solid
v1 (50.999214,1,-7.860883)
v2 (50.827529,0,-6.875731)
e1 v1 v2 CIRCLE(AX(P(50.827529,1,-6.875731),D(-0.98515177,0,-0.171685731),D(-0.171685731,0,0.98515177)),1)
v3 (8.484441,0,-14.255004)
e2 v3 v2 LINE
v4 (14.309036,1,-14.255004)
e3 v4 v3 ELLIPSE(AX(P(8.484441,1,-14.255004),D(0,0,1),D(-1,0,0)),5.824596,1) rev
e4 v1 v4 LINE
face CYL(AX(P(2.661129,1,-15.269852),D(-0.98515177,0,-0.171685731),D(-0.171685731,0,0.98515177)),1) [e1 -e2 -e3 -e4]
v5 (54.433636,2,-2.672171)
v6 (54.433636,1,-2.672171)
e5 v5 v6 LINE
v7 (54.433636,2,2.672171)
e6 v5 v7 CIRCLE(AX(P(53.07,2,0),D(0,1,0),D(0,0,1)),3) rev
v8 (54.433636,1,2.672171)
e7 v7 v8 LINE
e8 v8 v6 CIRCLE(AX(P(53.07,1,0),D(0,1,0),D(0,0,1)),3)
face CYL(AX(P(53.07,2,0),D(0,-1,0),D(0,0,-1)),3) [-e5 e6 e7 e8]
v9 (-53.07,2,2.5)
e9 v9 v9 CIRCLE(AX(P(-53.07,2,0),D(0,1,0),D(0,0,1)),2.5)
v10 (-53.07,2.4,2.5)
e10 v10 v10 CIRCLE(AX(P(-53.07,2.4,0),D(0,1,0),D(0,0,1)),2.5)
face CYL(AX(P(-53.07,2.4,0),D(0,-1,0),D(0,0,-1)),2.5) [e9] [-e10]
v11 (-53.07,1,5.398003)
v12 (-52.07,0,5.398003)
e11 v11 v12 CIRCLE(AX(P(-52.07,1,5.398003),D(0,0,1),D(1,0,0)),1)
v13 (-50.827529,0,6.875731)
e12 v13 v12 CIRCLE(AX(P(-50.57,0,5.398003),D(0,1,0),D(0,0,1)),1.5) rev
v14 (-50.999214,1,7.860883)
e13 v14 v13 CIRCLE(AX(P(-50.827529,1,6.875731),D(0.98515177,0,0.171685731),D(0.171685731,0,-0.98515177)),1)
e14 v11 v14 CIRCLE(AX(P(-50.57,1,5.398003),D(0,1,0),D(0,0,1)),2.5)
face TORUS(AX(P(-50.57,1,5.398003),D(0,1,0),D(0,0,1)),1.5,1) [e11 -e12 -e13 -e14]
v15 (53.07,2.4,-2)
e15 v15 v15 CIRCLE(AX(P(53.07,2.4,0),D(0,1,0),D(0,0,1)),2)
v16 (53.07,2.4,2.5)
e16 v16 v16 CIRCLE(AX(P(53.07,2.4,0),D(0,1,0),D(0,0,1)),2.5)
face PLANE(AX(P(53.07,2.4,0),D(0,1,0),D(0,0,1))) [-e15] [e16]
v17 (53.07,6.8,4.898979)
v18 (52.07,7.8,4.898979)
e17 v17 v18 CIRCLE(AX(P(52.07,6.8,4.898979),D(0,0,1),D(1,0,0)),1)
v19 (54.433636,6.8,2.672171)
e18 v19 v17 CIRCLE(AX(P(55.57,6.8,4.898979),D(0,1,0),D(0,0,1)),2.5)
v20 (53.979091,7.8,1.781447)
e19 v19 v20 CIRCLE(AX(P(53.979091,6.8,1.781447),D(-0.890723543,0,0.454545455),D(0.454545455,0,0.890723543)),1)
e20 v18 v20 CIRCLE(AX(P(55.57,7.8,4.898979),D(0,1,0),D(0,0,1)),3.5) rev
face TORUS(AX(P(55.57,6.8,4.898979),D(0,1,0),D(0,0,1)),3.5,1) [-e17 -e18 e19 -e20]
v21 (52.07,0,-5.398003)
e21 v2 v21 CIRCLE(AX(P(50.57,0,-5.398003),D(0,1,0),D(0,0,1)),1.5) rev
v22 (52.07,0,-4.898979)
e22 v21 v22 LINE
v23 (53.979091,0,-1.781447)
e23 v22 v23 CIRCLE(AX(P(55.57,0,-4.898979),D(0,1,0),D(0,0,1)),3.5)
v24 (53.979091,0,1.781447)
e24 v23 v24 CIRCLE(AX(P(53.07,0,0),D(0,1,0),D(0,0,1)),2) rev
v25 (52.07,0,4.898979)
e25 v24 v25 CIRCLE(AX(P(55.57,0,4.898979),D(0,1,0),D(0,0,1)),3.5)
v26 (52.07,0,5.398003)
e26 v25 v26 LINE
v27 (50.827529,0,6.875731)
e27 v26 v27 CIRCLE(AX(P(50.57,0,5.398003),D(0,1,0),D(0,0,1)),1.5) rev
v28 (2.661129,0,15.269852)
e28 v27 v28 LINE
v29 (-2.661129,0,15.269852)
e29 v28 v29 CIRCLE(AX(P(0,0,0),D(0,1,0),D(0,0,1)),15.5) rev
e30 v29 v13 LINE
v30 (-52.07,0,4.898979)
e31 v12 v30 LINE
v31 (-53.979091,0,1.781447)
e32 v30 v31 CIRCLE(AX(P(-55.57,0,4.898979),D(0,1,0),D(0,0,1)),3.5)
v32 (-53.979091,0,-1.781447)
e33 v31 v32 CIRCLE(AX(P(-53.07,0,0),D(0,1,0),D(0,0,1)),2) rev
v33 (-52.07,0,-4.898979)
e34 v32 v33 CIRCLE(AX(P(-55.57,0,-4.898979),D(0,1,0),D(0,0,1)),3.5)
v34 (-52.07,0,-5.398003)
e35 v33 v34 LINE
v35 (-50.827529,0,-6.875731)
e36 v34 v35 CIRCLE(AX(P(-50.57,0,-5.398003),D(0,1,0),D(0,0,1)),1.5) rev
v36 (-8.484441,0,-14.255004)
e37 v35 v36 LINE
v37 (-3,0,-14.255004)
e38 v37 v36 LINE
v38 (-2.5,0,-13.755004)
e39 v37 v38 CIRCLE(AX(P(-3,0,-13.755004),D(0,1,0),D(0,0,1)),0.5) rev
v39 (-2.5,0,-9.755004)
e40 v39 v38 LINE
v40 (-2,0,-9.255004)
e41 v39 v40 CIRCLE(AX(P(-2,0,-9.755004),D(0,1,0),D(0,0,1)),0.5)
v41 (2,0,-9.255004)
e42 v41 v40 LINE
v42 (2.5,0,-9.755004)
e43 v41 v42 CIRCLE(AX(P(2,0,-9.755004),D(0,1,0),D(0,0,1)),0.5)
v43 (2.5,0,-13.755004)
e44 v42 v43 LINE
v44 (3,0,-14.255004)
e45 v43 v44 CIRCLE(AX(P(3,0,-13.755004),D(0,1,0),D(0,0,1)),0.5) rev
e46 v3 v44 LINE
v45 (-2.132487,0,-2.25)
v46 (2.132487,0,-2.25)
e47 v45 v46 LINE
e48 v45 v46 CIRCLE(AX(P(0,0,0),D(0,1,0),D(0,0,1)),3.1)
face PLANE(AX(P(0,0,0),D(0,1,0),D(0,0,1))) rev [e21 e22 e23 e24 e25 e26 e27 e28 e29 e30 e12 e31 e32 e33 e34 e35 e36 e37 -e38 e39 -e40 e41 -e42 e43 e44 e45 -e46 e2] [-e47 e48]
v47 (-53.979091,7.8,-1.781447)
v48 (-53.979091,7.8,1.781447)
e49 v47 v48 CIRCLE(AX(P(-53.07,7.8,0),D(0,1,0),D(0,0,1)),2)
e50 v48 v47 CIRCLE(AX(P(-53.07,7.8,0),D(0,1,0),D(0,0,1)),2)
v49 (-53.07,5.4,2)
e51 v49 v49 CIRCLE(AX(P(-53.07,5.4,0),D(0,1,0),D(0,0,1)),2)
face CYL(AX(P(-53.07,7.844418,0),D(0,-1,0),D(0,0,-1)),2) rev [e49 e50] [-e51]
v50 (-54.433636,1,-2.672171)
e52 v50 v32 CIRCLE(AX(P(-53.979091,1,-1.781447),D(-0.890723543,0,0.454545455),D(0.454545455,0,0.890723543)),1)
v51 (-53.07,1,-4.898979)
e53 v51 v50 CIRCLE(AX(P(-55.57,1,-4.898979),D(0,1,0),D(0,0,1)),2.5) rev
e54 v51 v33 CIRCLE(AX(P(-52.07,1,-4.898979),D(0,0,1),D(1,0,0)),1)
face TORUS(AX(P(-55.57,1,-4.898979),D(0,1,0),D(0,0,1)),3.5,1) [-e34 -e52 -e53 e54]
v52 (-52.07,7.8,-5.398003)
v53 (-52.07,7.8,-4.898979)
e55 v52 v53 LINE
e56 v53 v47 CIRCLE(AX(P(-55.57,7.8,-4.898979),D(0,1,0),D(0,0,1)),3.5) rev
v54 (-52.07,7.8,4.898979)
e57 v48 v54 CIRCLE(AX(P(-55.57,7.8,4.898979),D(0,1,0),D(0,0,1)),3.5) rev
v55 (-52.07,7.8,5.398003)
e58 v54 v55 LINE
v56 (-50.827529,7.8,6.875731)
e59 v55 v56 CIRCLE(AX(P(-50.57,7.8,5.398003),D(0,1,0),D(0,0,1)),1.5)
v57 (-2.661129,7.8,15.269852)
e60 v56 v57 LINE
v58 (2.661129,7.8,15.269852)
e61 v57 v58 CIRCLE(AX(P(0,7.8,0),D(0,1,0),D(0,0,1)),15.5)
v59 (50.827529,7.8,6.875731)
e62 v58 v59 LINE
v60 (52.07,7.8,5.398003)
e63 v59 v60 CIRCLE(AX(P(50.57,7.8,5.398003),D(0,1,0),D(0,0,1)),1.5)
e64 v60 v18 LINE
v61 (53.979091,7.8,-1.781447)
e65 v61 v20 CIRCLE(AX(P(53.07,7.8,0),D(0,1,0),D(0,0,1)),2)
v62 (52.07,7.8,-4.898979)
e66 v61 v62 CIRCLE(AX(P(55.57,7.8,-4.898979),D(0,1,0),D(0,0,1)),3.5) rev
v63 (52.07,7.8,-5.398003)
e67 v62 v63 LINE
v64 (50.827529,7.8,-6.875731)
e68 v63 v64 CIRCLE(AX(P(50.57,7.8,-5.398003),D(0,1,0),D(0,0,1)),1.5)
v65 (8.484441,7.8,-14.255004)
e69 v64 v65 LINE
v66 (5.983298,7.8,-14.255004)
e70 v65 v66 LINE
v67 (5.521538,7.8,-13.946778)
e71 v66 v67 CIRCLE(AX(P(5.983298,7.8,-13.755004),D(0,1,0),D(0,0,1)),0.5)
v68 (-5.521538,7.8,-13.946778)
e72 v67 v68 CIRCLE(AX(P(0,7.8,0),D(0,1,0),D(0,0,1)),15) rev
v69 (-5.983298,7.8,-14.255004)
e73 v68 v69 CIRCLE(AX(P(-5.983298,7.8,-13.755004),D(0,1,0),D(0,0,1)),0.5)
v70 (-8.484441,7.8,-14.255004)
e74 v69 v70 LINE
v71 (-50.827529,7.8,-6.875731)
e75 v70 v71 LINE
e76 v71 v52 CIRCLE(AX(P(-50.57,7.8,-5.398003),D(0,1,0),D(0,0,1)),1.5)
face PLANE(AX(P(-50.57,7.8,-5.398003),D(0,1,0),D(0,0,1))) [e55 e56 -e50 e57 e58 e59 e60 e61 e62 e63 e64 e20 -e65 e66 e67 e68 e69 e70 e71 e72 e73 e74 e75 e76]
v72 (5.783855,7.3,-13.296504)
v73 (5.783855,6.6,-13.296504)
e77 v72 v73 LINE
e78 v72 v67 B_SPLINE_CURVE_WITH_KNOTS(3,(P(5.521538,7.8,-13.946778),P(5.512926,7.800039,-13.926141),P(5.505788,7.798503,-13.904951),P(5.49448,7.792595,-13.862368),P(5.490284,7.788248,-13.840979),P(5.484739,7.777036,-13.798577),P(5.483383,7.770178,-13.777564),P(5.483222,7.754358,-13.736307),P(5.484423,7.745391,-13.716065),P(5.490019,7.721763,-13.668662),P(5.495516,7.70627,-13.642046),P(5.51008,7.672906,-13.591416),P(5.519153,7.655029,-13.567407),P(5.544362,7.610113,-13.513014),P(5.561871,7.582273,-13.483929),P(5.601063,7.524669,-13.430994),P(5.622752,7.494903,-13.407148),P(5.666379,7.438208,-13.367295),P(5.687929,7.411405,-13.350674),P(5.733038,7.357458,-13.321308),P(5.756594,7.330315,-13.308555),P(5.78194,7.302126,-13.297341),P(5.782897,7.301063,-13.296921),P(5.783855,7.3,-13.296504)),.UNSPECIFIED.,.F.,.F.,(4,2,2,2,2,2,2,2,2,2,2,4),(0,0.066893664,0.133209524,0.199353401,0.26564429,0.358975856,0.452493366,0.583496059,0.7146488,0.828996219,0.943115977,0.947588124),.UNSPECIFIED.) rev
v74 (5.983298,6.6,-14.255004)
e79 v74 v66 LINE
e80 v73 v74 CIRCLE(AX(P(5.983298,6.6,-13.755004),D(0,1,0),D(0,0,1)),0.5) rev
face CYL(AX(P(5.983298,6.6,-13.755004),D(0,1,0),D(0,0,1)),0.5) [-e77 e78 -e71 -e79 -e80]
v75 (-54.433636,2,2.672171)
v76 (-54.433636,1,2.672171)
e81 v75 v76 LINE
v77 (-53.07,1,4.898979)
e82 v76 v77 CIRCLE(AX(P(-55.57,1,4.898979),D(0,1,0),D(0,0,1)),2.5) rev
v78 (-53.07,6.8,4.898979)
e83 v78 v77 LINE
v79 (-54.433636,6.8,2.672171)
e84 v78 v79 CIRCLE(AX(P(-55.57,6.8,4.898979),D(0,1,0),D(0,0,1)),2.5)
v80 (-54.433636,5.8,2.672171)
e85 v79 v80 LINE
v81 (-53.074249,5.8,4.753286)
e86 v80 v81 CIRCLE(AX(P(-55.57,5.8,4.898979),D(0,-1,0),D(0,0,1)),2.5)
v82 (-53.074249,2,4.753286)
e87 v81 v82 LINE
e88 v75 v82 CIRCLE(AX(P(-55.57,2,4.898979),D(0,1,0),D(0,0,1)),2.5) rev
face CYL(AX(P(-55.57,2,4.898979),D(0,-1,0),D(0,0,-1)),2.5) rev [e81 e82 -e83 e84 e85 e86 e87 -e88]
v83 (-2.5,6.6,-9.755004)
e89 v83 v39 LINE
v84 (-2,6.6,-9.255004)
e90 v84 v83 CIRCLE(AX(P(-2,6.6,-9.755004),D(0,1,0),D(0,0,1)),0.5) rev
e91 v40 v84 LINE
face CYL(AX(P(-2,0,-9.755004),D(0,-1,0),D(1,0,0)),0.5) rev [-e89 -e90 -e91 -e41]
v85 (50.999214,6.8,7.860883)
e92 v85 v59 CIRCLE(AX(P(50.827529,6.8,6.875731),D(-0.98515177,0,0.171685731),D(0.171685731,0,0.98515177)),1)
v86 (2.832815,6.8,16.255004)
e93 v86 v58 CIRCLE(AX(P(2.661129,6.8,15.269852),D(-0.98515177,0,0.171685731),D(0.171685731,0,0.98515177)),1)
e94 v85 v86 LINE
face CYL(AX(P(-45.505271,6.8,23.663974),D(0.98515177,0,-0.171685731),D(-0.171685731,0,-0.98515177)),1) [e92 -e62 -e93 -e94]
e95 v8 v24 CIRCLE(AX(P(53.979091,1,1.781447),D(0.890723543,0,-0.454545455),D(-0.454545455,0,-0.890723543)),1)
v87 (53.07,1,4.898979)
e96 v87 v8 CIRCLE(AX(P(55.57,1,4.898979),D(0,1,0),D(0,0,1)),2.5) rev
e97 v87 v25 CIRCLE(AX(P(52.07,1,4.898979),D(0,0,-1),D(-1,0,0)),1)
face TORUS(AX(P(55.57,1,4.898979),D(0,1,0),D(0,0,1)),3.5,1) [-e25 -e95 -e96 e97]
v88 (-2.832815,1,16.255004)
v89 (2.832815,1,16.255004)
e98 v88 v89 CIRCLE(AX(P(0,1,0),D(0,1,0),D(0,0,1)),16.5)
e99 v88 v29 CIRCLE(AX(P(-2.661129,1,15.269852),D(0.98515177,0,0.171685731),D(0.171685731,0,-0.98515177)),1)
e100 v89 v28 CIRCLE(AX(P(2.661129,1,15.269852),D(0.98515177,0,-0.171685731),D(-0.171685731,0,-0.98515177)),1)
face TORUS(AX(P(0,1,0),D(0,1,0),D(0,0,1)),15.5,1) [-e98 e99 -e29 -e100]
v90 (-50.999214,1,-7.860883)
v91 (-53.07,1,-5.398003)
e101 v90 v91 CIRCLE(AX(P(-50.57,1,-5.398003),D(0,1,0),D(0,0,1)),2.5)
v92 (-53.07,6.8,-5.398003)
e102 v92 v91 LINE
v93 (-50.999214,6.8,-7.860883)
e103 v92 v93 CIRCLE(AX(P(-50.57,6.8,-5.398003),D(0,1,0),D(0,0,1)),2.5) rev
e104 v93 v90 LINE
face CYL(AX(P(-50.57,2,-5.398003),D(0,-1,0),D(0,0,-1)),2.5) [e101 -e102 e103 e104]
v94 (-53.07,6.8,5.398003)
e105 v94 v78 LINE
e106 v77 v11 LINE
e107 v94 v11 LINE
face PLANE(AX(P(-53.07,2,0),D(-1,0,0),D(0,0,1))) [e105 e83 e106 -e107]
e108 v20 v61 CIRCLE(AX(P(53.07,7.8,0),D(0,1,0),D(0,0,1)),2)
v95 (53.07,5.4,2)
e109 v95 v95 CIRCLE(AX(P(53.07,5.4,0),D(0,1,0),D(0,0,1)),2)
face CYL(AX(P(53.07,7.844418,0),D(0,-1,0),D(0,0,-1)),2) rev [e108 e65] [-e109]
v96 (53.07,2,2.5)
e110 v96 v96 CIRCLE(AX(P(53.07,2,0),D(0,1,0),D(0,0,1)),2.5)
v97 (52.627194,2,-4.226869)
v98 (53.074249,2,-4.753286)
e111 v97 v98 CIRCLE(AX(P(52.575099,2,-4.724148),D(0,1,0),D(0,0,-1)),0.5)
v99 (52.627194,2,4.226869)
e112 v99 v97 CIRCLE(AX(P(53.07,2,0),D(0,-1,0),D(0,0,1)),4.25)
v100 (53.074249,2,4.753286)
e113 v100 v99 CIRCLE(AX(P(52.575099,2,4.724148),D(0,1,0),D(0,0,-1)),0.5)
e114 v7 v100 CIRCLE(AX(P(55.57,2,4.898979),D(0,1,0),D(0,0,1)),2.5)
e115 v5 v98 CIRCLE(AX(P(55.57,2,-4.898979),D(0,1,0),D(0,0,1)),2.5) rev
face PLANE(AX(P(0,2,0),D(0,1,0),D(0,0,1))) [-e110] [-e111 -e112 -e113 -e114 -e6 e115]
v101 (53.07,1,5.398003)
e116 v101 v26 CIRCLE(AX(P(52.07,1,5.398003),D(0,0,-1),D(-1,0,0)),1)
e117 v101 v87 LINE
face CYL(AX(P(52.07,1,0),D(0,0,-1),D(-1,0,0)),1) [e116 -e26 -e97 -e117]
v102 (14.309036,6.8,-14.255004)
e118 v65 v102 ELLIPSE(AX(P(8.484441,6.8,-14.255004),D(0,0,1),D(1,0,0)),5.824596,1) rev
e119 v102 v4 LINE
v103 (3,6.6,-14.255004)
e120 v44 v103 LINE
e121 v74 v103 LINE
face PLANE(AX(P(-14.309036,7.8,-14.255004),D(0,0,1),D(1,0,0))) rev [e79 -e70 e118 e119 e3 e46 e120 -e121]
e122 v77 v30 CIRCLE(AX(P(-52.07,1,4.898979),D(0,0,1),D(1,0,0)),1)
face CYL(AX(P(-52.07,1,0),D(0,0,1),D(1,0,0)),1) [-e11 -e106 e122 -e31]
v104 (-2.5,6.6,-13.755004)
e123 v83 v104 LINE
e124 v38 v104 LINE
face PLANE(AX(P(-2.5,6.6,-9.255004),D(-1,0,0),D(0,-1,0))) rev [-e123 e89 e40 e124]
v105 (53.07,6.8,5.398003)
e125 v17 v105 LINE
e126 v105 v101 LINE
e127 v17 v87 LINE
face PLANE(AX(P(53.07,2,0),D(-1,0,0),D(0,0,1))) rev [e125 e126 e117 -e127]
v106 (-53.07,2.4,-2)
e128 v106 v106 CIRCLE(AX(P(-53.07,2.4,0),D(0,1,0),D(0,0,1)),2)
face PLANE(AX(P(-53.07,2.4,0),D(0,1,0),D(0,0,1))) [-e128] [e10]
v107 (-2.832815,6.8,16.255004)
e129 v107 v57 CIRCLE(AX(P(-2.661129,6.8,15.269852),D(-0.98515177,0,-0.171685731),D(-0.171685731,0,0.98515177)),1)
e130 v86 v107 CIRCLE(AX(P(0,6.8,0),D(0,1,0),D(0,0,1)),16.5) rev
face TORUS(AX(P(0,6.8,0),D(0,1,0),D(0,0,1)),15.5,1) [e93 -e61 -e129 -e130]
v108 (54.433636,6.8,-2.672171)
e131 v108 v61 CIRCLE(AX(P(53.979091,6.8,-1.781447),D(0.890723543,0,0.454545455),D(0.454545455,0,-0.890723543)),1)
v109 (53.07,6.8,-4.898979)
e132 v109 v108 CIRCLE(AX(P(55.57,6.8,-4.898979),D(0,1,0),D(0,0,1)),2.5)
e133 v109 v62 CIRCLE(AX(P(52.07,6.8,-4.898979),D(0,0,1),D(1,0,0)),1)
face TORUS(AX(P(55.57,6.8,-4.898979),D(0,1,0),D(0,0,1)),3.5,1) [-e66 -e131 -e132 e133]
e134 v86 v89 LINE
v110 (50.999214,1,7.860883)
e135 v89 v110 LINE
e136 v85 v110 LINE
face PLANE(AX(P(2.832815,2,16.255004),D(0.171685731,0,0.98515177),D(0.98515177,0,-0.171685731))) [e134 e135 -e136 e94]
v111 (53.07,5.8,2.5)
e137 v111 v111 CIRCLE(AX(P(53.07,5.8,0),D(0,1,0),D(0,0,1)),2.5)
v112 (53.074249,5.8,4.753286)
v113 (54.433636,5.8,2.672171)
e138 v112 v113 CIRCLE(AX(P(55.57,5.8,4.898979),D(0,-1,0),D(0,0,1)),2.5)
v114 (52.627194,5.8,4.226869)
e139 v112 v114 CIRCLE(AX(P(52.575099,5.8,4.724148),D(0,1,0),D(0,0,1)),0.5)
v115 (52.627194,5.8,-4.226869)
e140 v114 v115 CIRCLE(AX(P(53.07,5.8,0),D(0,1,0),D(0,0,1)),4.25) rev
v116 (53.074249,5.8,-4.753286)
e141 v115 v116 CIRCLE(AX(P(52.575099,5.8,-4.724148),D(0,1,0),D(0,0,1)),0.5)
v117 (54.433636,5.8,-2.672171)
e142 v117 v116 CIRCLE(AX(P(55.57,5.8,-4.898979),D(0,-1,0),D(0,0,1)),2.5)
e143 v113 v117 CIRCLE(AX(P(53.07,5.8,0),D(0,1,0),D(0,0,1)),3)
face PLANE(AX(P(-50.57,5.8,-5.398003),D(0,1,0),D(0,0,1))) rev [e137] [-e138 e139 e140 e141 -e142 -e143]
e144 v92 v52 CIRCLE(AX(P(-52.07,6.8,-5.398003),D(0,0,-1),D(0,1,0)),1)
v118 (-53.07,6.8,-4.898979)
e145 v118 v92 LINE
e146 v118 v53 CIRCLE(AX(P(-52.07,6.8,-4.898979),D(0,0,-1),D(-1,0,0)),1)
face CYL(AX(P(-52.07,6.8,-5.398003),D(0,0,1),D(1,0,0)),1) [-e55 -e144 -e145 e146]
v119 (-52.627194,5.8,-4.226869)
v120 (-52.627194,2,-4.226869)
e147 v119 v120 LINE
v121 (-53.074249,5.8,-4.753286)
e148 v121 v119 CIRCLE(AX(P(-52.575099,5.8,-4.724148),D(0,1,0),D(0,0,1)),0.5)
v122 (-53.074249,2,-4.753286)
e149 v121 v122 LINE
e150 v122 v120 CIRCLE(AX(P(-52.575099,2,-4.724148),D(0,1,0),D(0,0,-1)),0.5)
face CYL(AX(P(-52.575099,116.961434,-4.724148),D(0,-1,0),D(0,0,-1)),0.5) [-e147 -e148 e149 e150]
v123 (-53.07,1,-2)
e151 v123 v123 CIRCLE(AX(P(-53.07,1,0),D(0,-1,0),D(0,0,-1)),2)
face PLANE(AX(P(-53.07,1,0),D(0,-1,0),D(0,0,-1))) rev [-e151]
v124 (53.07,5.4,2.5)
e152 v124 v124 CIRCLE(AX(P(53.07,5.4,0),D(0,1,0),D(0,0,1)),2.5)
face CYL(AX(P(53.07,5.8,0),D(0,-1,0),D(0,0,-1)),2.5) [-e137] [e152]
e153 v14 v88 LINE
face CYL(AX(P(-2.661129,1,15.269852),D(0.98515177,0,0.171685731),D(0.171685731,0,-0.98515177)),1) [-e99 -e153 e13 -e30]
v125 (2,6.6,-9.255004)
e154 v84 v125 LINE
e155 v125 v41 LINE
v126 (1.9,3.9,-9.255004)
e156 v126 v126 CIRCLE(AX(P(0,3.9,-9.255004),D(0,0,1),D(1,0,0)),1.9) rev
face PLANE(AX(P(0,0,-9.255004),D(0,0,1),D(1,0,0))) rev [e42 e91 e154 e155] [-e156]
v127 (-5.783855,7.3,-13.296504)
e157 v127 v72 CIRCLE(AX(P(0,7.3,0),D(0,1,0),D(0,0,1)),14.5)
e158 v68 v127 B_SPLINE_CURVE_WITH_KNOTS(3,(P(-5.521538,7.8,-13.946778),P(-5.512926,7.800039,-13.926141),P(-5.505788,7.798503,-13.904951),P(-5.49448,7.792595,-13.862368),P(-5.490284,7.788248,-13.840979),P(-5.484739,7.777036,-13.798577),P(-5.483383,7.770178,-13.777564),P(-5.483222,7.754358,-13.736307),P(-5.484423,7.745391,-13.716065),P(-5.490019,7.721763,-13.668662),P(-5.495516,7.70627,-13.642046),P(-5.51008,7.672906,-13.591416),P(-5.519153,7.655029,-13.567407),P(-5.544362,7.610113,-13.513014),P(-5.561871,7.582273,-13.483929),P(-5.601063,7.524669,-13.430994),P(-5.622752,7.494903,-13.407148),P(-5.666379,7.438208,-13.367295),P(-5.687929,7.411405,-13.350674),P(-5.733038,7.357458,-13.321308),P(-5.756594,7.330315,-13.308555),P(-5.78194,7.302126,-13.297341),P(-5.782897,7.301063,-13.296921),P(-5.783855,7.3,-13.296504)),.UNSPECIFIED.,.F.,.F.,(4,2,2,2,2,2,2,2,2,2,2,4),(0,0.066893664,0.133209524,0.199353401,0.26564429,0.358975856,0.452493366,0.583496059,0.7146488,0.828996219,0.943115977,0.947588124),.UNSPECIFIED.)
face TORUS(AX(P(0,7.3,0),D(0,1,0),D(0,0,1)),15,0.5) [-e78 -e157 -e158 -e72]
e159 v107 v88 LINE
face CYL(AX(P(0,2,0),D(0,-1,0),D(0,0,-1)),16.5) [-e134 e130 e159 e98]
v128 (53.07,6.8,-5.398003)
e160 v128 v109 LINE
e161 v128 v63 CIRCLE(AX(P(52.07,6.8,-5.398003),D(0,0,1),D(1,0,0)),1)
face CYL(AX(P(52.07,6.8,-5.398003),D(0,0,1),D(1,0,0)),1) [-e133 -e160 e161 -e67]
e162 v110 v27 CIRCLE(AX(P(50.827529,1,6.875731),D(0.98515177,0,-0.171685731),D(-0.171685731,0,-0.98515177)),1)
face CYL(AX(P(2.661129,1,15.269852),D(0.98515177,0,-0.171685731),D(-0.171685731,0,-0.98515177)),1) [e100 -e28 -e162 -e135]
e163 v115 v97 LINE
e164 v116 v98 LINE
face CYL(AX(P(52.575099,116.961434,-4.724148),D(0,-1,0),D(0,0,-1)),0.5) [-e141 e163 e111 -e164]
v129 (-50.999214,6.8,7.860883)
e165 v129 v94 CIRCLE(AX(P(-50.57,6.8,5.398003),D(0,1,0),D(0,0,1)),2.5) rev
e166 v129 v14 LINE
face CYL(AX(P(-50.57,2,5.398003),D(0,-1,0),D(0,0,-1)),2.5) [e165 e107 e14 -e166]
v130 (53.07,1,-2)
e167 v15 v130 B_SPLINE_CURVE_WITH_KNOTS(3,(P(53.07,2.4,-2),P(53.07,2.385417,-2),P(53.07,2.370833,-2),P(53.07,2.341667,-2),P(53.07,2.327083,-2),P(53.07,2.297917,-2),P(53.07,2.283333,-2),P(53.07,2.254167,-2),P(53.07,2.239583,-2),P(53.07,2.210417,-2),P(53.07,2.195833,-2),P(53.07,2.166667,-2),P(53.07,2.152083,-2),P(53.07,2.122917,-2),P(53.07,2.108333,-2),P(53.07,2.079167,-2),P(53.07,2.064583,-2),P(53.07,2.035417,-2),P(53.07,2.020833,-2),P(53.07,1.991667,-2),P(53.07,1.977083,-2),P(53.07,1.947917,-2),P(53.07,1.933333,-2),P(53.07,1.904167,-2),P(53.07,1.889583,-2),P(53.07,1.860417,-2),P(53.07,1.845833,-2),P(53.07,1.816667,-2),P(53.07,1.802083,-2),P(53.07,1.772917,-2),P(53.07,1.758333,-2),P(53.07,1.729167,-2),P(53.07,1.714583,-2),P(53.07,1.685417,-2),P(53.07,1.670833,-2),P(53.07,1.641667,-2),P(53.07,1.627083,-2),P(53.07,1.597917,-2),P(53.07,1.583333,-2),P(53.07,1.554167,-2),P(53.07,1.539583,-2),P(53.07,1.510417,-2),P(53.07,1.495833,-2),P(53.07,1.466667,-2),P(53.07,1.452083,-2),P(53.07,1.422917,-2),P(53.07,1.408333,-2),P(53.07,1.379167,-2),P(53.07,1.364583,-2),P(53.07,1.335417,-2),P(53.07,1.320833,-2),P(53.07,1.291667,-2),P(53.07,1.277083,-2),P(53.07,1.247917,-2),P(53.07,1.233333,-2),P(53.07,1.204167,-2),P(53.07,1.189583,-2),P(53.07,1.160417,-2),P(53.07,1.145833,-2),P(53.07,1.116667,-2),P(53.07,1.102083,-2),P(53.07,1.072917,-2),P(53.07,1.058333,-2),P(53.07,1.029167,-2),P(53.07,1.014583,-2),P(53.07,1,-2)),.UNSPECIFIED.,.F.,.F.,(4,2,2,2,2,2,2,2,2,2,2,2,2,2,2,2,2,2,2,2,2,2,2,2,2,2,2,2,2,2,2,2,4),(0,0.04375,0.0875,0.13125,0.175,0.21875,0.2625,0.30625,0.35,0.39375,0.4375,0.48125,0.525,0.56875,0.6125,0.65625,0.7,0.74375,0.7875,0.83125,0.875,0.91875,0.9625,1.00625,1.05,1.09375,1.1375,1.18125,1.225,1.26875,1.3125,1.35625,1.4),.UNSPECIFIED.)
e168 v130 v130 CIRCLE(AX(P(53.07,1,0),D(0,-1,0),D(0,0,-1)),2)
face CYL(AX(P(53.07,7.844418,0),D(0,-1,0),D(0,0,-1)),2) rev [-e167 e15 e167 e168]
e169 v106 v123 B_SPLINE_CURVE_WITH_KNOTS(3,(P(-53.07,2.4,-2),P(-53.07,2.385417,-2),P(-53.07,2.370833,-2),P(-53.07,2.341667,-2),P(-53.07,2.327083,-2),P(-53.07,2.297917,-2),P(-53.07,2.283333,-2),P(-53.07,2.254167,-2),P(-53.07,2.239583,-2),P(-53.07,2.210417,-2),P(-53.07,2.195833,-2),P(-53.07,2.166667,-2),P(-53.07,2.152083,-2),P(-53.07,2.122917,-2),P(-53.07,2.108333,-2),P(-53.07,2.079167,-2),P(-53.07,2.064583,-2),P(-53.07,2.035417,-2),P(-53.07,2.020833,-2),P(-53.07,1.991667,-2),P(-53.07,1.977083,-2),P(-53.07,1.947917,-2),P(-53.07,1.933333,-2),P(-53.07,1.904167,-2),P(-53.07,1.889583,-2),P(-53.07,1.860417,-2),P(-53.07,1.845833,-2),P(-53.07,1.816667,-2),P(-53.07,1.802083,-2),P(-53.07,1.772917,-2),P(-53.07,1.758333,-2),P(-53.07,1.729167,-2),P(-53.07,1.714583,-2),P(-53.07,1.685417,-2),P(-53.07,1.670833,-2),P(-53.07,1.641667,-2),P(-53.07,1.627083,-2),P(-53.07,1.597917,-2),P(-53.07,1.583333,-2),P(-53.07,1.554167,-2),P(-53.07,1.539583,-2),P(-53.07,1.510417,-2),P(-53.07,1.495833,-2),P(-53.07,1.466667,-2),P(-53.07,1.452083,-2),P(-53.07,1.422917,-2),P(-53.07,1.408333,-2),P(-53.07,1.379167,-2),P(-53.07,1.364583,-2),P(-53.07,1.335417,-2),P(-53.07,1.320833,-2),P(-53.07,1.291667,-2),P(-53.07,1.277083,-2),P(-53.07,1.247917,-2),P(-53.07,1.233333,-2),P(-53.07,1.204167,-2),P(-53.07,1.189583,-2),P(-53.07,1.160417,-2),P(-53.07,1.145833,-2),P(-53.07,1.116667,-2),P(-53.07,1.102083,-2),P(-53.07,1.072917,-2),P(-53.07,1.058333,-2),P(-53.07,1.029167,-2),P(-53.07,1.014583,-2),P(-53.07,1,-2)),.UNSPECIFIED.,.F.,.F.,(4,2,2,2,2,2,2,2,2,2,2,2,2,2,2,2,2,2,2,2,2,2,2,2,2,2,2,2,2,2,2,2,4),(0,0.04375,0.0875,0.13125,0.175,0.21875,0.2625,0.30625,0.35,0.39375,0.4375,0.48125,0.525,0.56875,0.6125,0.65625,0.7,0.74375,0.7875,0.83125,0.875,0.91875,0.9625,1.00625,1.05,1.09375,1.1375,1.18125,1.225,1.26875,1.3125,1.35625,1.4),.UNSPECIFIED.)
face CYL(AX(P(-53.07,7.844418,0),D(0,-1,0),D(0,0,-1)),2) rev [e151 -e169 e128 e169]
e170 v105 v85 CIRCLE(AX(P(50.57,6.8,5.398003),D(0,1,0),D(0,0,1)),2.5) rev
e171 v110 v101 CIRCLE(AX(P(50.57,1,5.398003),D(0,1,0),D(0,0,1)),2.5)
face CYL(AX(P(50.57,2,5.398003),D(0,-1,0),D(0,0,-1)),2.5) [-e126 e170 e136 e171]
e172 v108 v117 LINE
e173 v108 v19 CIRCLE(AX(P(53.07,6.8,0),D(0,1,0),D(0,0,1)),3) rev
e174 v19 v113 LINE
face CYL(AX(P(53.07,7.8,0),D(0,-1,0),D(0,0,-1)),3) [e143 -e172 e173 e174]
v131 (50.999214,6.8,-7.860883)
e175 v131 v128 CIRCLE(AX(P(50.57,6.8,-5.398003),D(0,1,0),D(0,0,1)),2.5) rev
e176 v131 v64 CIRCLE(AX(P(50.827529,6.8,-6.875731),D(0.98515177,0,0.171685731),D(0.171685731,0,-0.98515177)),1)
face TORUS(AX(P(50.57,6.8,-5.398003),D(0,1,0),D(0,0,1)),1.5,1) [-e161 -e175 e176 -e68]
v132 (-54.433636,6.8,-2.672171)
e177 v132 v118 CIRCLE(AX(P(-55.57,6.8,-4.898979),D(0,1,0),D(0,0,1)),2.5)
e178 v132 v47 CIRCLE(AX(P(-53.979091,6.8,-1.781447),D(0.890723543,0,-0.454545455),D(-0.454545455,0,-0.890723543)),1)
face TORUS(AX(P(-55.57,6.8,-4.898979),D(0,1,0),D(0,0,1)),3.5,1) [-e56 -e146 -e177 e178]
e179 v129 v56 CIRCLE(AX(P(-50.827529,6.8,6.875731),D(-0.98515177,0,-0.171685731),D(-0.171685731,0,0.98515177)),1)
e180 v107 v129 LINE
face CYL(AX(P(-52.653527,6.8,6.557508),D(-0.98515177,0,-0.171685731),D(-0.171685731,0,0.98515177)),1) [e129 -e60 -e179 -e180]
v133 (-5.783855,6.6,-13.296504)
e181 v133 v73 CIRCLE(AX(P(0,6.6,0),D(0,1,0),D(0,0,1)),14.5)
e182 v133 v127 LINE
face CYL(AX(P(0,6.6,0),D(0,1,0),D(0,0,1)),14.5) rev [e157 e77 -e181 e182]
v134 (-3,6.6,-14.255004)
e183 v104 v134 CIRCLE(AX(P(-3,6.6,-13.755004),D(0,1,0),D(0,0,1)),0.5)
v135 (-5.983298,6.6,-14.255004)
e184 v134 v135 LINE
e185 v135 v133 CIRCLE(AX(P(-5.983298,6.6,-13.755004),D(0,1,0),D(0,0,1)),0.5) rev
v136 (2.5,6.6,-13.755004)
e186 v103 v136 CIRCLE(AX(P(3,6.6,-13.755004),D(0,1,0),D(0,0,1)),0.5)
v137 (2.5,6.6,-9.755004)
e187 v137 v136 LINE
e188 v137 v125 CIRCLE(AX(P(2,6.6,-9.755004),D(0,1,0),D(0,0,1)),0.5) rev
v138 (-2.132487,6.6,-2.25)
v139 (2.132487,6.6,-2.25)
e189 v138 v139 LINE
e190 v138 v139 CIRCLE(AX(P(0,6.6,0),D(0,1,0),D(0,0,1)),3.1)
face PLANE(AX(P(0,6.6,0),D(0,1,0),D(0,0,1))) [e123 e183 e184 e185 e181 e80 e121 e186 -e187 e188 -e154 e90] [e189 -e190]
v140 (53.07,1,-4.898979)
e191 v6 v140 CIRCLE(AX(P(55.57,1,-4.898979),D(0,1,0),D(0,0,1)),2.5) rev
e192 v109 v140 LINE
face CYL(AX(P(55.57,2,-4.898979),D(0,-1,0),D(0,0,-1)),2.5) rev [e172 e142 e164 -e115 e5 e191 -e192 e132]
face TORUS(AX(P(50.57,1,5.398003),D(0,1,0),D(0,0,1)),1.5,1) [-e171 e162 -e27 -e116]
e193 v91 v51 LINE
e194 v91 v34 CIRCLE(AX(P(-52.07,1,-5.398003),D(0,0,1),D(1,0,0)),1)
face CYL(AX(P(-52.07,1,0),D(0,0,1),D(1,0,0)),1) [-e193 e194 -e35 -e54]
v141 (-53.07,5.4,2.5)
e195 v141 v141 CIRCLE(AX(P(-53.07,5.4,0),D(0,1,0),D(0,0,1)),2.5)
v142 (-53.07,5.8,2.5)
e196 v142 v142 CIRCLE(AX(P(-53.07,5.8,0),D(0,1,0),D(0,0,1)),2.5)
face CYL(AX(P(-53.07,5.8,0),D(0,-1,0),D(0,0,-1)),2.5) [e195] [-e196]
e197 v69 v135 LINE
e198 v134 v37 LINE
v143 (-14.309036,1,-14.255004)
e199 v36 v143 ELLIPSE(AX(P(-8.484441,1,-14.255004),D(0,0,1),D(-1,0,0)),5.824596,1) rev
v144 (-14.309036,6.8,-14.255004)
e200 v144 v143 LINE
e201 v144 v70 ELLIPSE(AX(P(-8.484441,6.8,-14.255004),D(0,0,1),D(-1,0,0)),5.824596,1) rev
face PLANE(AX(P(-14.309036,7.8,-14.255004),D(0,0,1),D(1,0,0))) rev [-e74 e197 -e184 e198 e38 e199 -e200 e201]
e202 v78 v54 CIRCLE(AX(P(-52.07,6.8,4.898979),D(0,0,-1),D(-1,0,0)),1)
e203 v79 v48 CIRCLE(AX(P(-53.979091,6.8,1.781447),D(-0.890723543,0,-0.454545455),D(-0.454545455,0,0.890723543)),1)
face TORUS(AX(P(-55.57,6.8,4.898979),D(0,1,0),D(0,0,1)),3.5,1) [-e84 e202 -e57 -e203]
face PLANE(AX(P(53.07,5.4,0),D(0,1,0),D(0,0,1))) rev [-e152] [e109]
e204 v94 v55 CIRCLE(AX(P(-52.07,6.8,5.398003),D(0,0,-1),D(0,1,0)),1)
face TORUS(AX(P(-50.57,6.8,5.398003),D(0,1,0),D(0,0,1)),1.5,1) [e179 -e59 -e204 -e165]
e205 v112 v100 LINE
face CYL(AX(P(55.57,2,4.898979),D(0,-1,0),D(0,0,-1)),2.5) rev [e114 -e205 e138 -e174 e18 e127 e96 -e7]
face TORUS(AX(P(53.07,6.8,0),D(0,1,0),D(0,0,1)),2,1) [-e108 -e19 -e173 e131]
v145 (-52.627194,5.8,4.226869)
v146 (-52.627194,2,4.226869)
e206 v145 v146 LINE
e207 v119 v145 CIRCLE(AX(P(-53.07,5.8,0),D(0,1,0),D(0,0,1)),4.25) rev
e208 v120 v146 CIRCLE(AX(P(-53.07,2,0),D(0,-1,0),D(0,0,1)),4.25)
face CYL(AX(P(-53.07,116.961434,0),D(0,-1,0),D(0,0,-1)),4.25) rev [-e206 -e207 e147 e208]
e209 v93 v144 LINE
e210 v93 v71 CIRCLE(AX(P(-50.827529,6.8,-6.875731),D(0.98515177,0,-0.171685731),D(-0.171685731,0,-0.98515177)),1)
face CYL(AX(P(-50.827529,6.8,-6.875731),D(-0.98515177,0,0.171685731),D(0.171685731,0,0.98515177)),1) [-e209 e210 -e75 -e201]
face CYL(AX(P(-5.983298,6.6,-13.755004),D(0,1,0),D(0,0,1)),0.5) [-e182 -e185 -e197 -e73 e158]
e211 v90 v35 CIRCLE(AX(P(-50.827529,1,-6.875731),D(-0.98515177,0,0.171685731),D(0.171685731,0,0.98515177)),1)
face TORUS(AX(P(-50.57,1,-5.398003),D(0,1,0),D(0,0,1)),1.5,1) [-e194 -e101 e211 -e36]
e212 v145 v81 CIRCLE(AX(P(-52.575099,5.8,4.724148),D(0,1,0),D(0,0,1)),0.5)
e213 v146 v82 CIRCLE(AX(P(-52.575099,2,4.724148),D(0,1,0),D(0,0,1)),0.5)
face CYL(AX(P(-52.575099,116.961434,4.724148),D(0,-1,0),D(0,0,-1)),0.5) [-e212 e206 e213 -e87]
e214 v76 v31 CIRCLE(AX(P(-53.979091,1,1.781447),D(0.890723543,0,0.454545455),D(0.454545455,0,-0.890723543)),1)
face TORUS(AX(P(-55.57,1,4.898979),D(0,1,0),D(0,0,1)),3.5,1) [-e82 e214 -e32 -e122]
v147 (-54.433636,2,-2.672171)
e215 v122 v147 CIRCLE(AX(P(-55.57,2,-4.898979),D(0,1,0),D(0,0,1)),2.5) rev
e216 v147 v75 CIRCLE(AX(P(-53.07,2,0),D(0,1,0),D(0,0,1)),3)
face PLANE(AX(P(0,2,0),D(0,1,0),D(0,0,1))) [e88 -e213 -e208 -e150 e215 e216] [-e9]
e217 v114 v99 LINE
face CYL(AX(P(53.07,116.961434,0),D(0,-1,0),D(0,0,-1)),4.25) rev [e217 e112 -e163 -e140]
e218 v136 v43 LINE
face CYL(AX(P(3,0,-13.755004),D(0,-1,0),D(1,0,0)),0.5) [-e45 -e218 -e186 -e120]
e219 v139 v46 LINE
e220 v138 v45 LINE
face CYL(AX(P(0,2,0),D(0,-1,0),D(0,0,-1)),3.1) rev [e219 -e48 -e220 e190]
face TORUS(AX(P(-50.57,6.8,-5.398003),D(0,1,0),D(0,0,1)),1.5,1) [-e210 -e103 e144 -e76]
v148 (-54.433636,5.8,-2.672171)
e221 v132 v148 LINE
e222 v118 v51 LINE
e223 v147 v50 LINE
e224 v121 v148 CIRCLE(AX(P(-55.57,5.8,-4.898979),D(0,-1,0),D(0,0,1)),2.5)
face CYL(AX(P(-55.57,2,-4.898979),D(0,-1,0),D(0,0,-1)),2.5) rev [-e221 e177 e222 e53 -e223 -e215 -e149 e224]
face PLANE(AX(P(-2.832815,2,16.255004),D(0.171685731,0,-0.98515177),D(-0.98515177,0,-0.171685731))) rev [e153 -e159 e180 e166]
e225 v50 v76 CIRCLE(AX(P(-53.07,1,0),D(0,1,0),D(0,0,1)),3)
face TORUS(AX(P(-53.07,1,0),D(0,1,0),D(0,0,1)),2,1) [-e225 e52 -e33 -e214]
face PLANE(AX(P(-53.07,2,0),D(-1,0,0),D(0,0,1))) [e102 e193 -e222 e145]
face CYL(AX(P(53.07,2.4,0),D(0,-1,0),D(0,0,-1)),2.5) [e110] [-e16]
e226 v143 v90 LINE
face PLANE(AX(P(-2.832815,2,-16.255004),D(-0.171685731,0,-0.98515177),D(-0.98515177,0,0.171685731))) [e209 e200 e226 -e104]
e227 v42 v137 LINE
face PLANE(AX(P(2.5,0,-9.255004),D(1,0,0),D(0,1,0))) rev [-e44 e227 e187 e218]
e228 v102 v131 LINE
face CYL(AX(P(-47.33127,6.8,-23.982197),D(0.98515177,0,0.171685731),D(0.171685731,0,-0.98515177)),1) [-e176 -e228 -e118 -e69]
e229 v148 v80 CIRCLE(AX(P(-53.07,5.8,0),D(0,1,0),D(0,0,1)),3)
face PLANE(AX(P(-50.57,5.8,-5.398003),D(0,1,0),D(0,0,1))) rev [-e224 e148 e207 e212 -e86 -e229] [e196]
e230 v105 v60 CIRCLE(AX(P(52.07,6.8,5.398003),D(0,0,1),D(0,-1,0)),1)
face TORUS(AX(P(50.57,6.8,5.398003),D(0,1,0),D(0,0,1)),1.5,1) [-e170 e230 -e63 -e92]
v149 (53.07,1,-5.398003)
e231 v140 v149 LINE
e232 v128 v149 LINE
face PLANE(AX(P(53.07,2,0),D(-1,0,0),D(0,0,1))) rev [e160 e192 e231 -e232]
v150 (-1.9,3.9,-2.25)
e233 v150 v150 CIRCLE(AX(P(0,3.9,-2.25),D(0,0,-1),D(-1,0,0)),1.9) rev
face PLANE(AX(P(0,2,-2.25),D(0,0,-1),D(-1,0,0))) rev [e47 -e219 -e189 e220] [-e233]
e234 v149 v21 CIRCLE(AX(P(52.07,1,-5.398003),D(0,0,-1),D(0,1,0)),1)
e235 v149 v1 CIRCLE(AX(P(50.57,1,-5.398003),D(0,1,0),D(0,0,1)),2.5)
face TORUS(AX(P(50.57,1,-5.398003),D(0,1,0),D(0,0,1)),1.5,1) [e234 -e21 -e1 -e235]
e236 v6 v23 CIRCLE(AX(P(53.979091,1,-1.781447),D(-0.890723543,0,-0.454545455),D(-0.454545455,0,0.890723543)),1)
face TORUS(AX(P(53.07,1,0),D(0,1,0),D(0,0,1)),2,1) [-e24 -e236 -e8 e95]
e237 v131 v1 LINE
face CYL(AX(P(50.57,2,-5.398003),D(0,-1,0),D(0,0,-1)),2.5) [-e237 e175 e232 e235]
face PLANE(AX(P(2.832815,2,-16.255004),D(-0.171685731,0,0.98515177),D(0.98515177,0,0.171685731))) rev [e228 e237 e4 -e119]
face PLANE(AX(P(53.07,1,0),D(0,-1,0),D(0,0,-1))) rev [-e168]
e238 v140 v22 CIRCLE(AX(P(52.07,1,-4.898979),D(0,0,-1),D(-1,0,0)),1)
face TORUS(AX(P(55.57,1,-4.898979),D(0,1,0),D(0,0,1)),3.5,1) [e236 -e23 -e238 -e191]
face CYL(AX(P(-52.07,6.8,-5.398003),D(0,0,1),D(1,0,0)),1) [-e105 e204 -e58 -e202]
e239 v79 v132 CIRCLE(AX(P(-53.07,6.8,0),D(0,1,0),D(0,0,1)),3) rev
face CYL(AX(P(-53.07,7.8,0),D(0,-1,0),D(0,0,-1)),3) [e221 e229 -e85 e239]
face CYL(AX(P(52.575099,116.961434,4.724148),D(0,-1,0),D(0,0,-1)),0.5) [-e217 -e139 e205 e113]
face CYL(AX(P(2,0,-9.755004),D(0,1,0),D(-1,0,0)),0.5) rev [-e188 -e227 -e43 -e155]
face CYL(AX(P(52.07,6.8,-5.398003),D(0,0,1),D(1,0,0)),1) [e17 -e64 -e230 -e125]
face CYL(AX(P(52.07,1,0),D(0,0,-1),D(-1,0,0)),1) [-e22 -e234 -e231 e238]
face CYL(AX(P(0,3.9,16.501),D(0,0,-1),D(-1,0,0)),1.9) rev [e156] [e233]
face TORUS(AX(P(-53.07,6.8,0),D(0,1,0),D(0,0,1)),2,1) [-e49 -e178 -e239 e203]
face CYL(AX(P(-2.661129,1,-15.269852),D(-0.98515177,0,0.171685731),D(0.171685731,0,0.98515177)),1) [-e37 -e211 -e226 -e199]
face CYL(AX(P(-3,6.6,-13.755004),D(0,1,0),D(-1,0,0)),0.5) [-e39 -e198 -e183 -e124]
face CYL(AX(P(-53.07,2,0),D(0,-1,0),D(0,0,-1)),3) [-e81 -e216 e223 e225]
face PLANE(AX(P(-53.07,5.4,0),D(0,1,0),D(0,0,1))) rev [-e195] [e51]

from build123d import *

# Parameters (mm, degrees)
BOSS_EXTRUDE1_DEPTH = 2
SKETCH2_R           = 2.5
BOSS_EXTRUDE2_DEPTH = 0.4
SKETCH3_R           = 2
BOSS_EXTRUDE3_DEPTH = 3
SKETCH5_R           = 2.5
BOSS_EXTRUDE4_DEPTH = 0.4
BOSS_EXTRUDE5_DEPTH = 3.8
BOSS_EXTRUDE6_DEPTH = 2
CUT_EXTRUDE1_DEPTH  = 59.965539936
CUT_EXTRUDE2_REACH  = 66.425
SKETCH8_R           = 1.9
SKETCH9_R           = 14.5
CUT_EXTRUDE3_DEPTH  = 1.2
FILLET1_R           = 0.5
SKETCH10_W          = 5
SKETCH10_H          = 6.6
CUT_EXTRUDE4_DEPTH  = 5
FILLET2_R           = 0.5
CUT_EXTRUDE5_START  = -1
SKETCH12_R          = 2
CUT_EXTRUDE5_DEPTH  = 58.96553995
FILLET4_R           = 1


# Some blends are built 0.0001 mm under size
with BuildPart() as part:
    # Sketch1 → Boss-Extrude1 (new body)
    with BuildSketch(Plane(origin=(0, 0, 0), x_dir=(1, 0, 0), z_dir=(0, 1, 0))):
        with BuildLine():
            Line((-53.07, -5.398003398), (-53.07, -4.898979486))
            ThreePointArc((-53.07, -4.898979486), (-53.437992836, -3.593397066), (-54.433636364, -2.672170628))
            ThreePointArc((-54.433636364, -2.672170628), (-56.07, 0), (-54.433636364, 2.672170628))
            ThreePointArc((-54.433636364, 2.672170628), (-53.437992836, 3.593397066), (-53.07, 4.898979486))
            Line((-53.07, 4.898979486), (-53.07, 5.398003398))
            ThreePointArc((-53.07, 5.398003398), (-52.483509318, 7.006879431), (-50.999214327, 7.860882822))
            Line((-50.999214327, 7.860882822), (-2.832814556, 16.255004205))
            ThreePointArc((-2.832814556, 16.255004205), (0, 16.5), (2.832814556, 16.255004205))
            Line((2.832814556, 16.255004205), (50.999214327, 7.860882822))
            ThreePointArc((50.999214327, 7.860882822), (52.483509318, 7.006879431), (53.07, 5.398003398))
            Line((53.07, 5.398003398), (53.07, 4.898979486))
            ThreePointArc((53.07, 4.898979486), (53.437992836, 3.593397066), (54.433636364, 2.672170628))
            ThreePointArc((54.433636364, 2.672170628), (56.07, 0), (54.433636364, -2.672170628))
            ThreePointArc((54.433636364, -2.672170628), (53.437992836, -3.593397066), (53.07, -4.898979486))
            Line((53.07, -4.898979486), (53.07, -5.398003398))
            ThreePointArc((53.07, -5.398003398), (52.483509318, -7.006879431), (50.999214327, -7.860882822))
            Line((50.999214327, -7.860882822), (2.832814556, -16.255004205))
            ThreePointArc((2.832814556, -16.255004205), (0, -16.5), (-2.832814556, -16.255004205))
            Line((-2.832814556, -16.255004205), (-50.999214327, -7.860882822))
            ThreePointArc((-50.999214327, -7.860882822), (-52.483509318, -7.006879431), (-53.07, -5.398003398))
        make_face()
        with BuildLine():
            Line((-2.132486811, 2.25), (2.132486811, 2.25))
            ThreePointArc((2.132486811, 2.25), (0, -3.1), (-2.132486811, 2.25))
        make_face(mode=Mode.SUBTRACT)
    extrude(amount=BOSS_EXTRUDE1_DEPTH)

    # Sketch2 → Boss-Extrude2 (add)
    with BuildSketch(Plane(origin=(0, 2, 0), x_dir=(1, 0, 0), z_dir=(0, 1, 0))):
        with Locations(Location((-53.07, 0, 0), (0, 0, 270))):
            Circle(SKETCH2_R)
        with Locations(Location((53.07, 0, 0), (0, 0, 270))):
            Circle(SKETCH2_R)
    extrude(amount=BOSS_EXTRUDE2_DEPTH)

    # Sketch3 → Boss-Extrude3 (add)
    with BuildSketch(Plane(origin=(0, 2.4, 0), x_dir=(1, 0, 0), z_dir=(0, 1, 0))):
        with Locations(Location((-53.07, 0, 0), (0, 0, 270))):
            Circle(SKETCH3_R)
        with Locations(Location((53.07, 0, 0), (0, 0, 270))):
            Circle(SKETCH3_R)
    extrude(amount=BOSS_EXTRUDE3_DEPTH)

    # Sketch5 → Boss-Extrude4 (add)
    with BuildSketch(Plane(origin=(0, 5.4, 0), x_dir=(1, 0, 0), z_dir=(0, 1, 0))):
        with Locations(Location((-53.07, 0, 0), (0, 0, 270))):
            Circle(SKETCH5_R)
        with Locations(Location((53.07, 0, 0), (0, 0, 270))):
            Circle(SKETCH5_R)
    extrude(amount=BOSS_EXTRUDE4_DEPTH)

    # Sketch4 → Boss-Extrude5 (add)
    with BuildSketch(Plane(origin=(0, 2, 0), x_dir=(1, 0, 0), z_dir=(0, 1, 0))):
        with BuildLine():
            Line((-53.07, 5.398003398), (-53.07, 4.898979486))
            ThreePointArc((-53.07, 4.898979486), (-53.071062452, 4.826101989), (-53.074248904, 4.753286436))
            ThreePointArc((-53.074248904, 4.753286436), (-52.95621099, 4.400491511), (-52.62719356, 4.226869108))
            ThreePointArc((-52.62719356, 4.226869108), (-48.82, 0), (-52.62719356, -4.226869108))
            ThreePointArc((-52.62719356, -4.226869108), (-52.95621099, -4.400491511), (-53.074248904, -4.753286436))
            ThreePointArc((-53.074248904, -4.753286436), (-53.071062452, -4.826101989), (-53.07, -4.898979486))
            Line((-53.07, -4.898979486), (-53.07, -5.398003398))
            ThreePointArc((-53.07, -5.398003398), (-52.483509318, -7.006879431), (-50.999214327, -7.860882822))
            Line((-50.999214327, -7.860882822), (-2.832814556, -16.255004205))
            ThreePointArc((-2.832814556, -16.255004205), (0, -16.5), (2.832814556, -16.255004205))
            Line((2.832814556, -16.255004205), (50.999214327, -7.860882822))
            ThreePointArc((50.999214327, -7.860882822), (52.483509318, -7.006879431), (53.07, -5.398003398))
            Line((53.07, -5.398003398), (53.07, -4.898979486))
            ThreePointArc((53.07, -4.898979486), (53.071062452, -4.826101989), (53.074248904, -4.753286436))
            ThreePointArc((53.074248904, -4.753286436), (52.95621099, -4.400491511), (52.62719356, -4.226869108))
            ThreePointArc((52.62719356, -4.226869108), (48.82, 0), (52.62719356, 4.226869108))
            ThreePointArc((52.62719356, 4.226869108), (52.95621099, 4.400491511), (53.074248904, 4.753286436))
            ThreePointArc((53.074248904, 4.753286436), (53.071062452, 4.826101989), (53.07, 4.898979486))
            Line((53.07, 4.898979486), (53.07, 5.398003398))
            ThreePointArc((53.07, 5.398003398), (52.483509318, 7.006879431), (50.999214327, 7.860882822))
            Line((50.999214327, 7.860882822), (2.832814556, 16.255004205))
            ThreePointArc((2.832814556, 16.255004205), (0, 16.5), (-2.832814556, 16.255004205))
            Line((-2.832814556, 16.255004205), (-50.999214327, 7.860882822))
            ThreePointArc((-50.999214327, 7.860882822), (-52.483509318, 7.006879431), (-53.07, 5.398003398))
        make_face()
        with BuildLine():
            Line((2.132486811, 2.25), (-2.132486811, 2.25))
            ThreePointArc((-2.132486811, 2.25), (0, -3.1), (2.132486811, 2.25))
        make_face(mode=Mode.SUBTRACT)
    extrude(amount=BOSS_EXTRUDE5_DEPTH)

    # Sketch6 → Boss-Extrude6 (add)
    with BuildSketch(Plane(origin=(0, 5.8, 0), x_dir=(1, 0, 0), z_dir=(0, 1, 0))):
        with BuildLine():
            Line((-2.832814556, 16.255004205), (-50.999214327, 7.860882822))
            ThreePointArc((-50.999214327, 7.860882822), (-52.483509318, 7.006879431), (-53.07, 5.398003398))
            Line((-53.07, 5.398003398), (-53.07, 4.898979486))
            ThreePointArc((-53.07, 4.898979486), (-53.437992836, 3.593397066), (-54.433636364, 2.672170628))
            ThreePointArc((-54.433636364, 2.672170628), (-56.07, 0), (-54.433636364, -2.672170628))
            ThreePointArc((-54.433636364, -2.672170628), (-53.437992836, -3.593397066), (-53.07, -4.898979486))
            Line((-53.07, -4.898979486), (-53.07, -5.398003398))
            ThreePointArc((-53.07, -5.398003398), (-52.483509318, -7.006879431), (-50.999214327, -7.860882822))
            Line((-50.999214327, -7.860882822), (-2.832814556, -16.255004205))
            ThreePointArc((-2.832814556, -16.255004205), (0, -16.5), (2.832814556, -16.255004205))
            Line((2.832814556, -16.255004205), (50.999214327, -7.860882822))
            ThreePointArc((50.999214327, -7.860882822), (52.483509318, -7.006879431), (53.07, -5.398003398))
            Line((53.07, -5.398003398), (53.07, -4.898979486))
            ThreePointArc((53.07, -4.898979486), (53.437992836, -3.593397066), (54.433636364, -2.672170628))
            ThreePointArc((54.433636364, -2.672170628), (56.07, 0), (54.433636364, 2.672170628))
            ThreePointArc((54.433636364, 2.672170628), (53.437992836, 3.593397066), (53.07, 4.898979486))
            Line((53.07, 4.898979486), (53.07, 5.398003398))
            ThreePointArc((53.07, 5.398003398), (52.483509318, 7.006879431), (50.999214327, 7.860882822))
            Line((50.999214327, 7.860882822), (2.832814556, 16.255004205))
            ThreePointArc((2.832814556, 16.255004205), (0, 16.5), (-2.832814556, 16.255004205))
        make_face()
        with BuildLine():
            Line((2.132486811, 2.25), (-2.132486811, 2.25))
            ThreePointArc((-2.132486811, 2.25), (0, -3.1), (2.132486811, 2.25))
        make_face(mode=Mode.SUBTRACT)
    extrude(amount=BOSS_EXTRUDE6_DEPTH)

    # Sketch7 → Cut-Extrude1 (cut, through all)
    with BuildSketch(Plane.XZ):
        with BuildLine():
            Line((-14.309036444, -14.255004205), (14.309036444, -14.255004205))
            Line((14.309036444, -14.255004205), (2.832814556, -16.255004205))
            ThreePointArc((2.832814556, -16.255004205), (0, -16.5), (-2.832814556, -16.255004205))
            Line((-2.832814556, -16.255004205), (-14.309036444, -14.255004205))
        make_face()
    extrude(amount=-CUT_EXTRUDE1_DEPTH, mode=Mode.SUBTRACT)

    # Sketch8 → Cut-Extrude2 (cut, up to next)
    with BuildSketch(Plane(origin=(0, 0, -14.255004205), x_dir=(-1, 0, 0), z_dir=(0, 0, -1)), mode=Mode.PRIVATE) as cut_extrude2_sk1:
        with Locations((0, 3.9)):
            Circle(SKETCH8_R)
    cut_extrude2_tool1 = extrude(cut_extrude2_sk1.sketch, amount=-CUT_EXTRUDE2_REACH, mode=Mode.PRIVATE) & part.part
    add(cut_extrude2_tool1.solids().sort_by_distance((0, 3.9, -14.255004))[0], mode=Mode.SUBTRACT)

    # Sketch9 → Cut-Extrude3 (cut)
    with BuildSketch(Plane(origin=(0, 7.8, 0), x_dir=(1, 0, 0), z_dir=(0, 1, 0))):
        Circle(SKETCH9_R)
    extrude(amount=-CUT_EXTRUDE3_DEPTH, mode=Mode.SUBTRACT)

    # Fillet1
    fillet1_edges = [part.edges().sort_by_distance(p)[0] for p in [
        (-2.654214597, 7.2, -14.255004205),
        (2.654214597, 7.2, -14.255004205),
    ]]
    fillet(fillet1_edges, radius=FILLET1_R)

    # Sketch10 → Cut-Extrude4 (cut)
    with BuildSketch(Plane(origin=(0, 0, -14.255004205), x_dir=(-1, 0, 0), z_dir=(0, 0, -1))):
        with Locations((0, 3.3)):
            Rectangle(SKETCH10_W, SKETCH10_H)
    extrude(amount=-CUT_EXTRUDE4_DEPTH, mode=Mode.SUBTRACT)

    # Fillet2
    # the kernel refuses this fillet: 0.5 mm, written as the material it adds along each edge
    with BuildSketch(Plane(origin=(2.5, 0, -9.255004205), x_dir=(-1, 0, 0), z_dir=(0, 1, 0))) as fillet2_piece_1:
        with BuildLine():
            CenterArc((FILLET2_R, -FILLET2_R), FILLET2_R, 90, 90)
            Line((0, -FILLET2_R), (0, 0))
            Line((0, 0), (FILLET2_R, 0))
        make_face()
    extrude(amount=6.6)
    with BuildSketch(Plane(origin=(-2.5, 6.6, -9.255004205), x_dir=(0, 0, -1), z_dir=(0, -1, 0))) as fillet2_piece_2:
        with BuildLine():
            CenterArc((FILLET2_R, FILLET2_R), FILLET2_R, 180, 90)
            Line((0, FILLET2_R), (0, 0))
            Line((0, 0), (FILLET2_R, 0))
        make_face()
    extrude(amount=6.6)
    # the kernel refuses this fillet: 0.5 mm, written as the material it takes off along each edge
    with BuildSketch(Plane(origin=(0, 7.8, 0), x_dir=(0.31805314745335045, 0, -0.9480728850647598), z_dir=(-0.9480728850647598, 0, -0.31805314745335045))) as fillet2_2_piece_1:
        with BuildLine():
            CenterArc((14.5 + FILLET2_R, FILLET2_R), FILLET2_R, 180, 90)
            Line((14.5 + FILLET2_R, 0), (14.5, 0))
            Line((14.5, 0), (14.5, FILLET2_R))
        make_face()
    revolve(axis=Axis((0, 7.8, 0), (0, -1, 0)), revolution_arc=322.909543442, mode=Mode.SUBTRACT)
    with BuildSketch(Plane(origin=(2.5, -1.25, -14.255004205), x_dir=(0, 0, 1), z_dir=(0, 1, 0))) as fillet2_2_piece_2:
        with BuildLine():
            CenterArc((FILLET2_R, FILLET2_R), FILLET2_R, 180, 90)
            Line((0, FILLET2_R), (0, 0))
            Line((0, 0), (FILLET2_R, 0))
        make_face()
    extrude(amount=9.1, mode=Mode.SUBTRACT)
    with BuildSketch(Plane(origin=(-2.5, 7.85, -14.255004205), x_dir=(-1, 0, 0), z_dir=(0, -1, 0))) as fillet2_2_piece_3:
        with BuildLine():
            CenterArc((FILLET2_R, -FILLET2_R), FILLET2_R, 90, 90)
            Line((0, -FILLET2_R), (0, 0))
            Line((0, 0), (FILLET2_R, 0))
        make_face()
    extrude(amount=9.1, mode=Mode.SUBTRACT)

    # Sketch12 → Cut-Extrude5 (cut, through all)
    with BuildSketch(Plane.XZ.offset(CUT_EXTRUDE5_START)):
        with Locations(Location((-53.07, 0, 0), (0, 0, 270))):
            Circle(SKETCH12_R)
        with Locations(Location((53.07, 0, 0), (0, 0, 270))):
            Circle(SKETCH12_R)
    extrude(amount=-CUT_EXTRUDE5_DEPTH, mode=Mode.SUBTRACT)

    # Fillet4
    fillet4_edges = [part.edges().sort_by_distance(p)[0] for p in [
        (-52.483509318, 7.8, -7.006879431),
        (-53.07, 7.8, -5.148491442),
        (-53.437992836, 7.8, -3.593397066),
        (-56.07, 7.8, 0),
        (-53.437992836, 7.8, 3.593397066),
        (-53.07, 7.8, 5.148491442),
        (-52.483509318, 7.8, 7.006879431),
        (-26.916014441, 7.8, 12.057943514),
        (0, 7.8, 16.5),
        (26.916014441, 7.8, 12.057943514),
        (52.483509318, 7.8, 7.006879431),
        (53.07, 7.8, 5.148491442),
        (53.437992836, 7.8, 3.593397066),
        (56.07, 7.8, 0),
        (53.437992836, 7.8, -3.593397066),
        (53.07, 7.8, -5.148491442),
        (52.483509318, 7.8, -7.006879431),
        (32.654125385, 7.8, -11.057943514),
        (-32.654125385, 7.8, -11.057943514),
        (-32.654125385, 0, -11.057943514),
        (32.654125385, 0, -11.057943514),
        (52.483509318, 0, -7.006879431),
        (53.07, 0, -5.148491442),
        (53.437992836, 0, -3.593397066),
        (56.07, 0, 0),
        (53.437992836, 0, 3.593397066),
        (53.07, 0, 5.148491442),
        (52.483509318, 0, 7.006879431),
        (26.916014441, 0, 12.057943514),
        (0, 0, 16.5),
        (-26.916014441, 0, 12.057943514),
        (-52.483509318, 0, 7.006879431),
        (-53.07, 0, 5.148491442),
        (-53.437992836, 0, 3.593397066),
        (-56.07, 0, 0),
        (-53.437992836, 0, -3.593397066),
        (-53.07, 0, -5.148491442),
        (-52.483509318, 0, -7.006879431),
    ]]
    fillet(fillet4_edges, radius=FILLET4_R - 0.0001)  # a hair under: the kernel refuses the full size


solid = part.part
